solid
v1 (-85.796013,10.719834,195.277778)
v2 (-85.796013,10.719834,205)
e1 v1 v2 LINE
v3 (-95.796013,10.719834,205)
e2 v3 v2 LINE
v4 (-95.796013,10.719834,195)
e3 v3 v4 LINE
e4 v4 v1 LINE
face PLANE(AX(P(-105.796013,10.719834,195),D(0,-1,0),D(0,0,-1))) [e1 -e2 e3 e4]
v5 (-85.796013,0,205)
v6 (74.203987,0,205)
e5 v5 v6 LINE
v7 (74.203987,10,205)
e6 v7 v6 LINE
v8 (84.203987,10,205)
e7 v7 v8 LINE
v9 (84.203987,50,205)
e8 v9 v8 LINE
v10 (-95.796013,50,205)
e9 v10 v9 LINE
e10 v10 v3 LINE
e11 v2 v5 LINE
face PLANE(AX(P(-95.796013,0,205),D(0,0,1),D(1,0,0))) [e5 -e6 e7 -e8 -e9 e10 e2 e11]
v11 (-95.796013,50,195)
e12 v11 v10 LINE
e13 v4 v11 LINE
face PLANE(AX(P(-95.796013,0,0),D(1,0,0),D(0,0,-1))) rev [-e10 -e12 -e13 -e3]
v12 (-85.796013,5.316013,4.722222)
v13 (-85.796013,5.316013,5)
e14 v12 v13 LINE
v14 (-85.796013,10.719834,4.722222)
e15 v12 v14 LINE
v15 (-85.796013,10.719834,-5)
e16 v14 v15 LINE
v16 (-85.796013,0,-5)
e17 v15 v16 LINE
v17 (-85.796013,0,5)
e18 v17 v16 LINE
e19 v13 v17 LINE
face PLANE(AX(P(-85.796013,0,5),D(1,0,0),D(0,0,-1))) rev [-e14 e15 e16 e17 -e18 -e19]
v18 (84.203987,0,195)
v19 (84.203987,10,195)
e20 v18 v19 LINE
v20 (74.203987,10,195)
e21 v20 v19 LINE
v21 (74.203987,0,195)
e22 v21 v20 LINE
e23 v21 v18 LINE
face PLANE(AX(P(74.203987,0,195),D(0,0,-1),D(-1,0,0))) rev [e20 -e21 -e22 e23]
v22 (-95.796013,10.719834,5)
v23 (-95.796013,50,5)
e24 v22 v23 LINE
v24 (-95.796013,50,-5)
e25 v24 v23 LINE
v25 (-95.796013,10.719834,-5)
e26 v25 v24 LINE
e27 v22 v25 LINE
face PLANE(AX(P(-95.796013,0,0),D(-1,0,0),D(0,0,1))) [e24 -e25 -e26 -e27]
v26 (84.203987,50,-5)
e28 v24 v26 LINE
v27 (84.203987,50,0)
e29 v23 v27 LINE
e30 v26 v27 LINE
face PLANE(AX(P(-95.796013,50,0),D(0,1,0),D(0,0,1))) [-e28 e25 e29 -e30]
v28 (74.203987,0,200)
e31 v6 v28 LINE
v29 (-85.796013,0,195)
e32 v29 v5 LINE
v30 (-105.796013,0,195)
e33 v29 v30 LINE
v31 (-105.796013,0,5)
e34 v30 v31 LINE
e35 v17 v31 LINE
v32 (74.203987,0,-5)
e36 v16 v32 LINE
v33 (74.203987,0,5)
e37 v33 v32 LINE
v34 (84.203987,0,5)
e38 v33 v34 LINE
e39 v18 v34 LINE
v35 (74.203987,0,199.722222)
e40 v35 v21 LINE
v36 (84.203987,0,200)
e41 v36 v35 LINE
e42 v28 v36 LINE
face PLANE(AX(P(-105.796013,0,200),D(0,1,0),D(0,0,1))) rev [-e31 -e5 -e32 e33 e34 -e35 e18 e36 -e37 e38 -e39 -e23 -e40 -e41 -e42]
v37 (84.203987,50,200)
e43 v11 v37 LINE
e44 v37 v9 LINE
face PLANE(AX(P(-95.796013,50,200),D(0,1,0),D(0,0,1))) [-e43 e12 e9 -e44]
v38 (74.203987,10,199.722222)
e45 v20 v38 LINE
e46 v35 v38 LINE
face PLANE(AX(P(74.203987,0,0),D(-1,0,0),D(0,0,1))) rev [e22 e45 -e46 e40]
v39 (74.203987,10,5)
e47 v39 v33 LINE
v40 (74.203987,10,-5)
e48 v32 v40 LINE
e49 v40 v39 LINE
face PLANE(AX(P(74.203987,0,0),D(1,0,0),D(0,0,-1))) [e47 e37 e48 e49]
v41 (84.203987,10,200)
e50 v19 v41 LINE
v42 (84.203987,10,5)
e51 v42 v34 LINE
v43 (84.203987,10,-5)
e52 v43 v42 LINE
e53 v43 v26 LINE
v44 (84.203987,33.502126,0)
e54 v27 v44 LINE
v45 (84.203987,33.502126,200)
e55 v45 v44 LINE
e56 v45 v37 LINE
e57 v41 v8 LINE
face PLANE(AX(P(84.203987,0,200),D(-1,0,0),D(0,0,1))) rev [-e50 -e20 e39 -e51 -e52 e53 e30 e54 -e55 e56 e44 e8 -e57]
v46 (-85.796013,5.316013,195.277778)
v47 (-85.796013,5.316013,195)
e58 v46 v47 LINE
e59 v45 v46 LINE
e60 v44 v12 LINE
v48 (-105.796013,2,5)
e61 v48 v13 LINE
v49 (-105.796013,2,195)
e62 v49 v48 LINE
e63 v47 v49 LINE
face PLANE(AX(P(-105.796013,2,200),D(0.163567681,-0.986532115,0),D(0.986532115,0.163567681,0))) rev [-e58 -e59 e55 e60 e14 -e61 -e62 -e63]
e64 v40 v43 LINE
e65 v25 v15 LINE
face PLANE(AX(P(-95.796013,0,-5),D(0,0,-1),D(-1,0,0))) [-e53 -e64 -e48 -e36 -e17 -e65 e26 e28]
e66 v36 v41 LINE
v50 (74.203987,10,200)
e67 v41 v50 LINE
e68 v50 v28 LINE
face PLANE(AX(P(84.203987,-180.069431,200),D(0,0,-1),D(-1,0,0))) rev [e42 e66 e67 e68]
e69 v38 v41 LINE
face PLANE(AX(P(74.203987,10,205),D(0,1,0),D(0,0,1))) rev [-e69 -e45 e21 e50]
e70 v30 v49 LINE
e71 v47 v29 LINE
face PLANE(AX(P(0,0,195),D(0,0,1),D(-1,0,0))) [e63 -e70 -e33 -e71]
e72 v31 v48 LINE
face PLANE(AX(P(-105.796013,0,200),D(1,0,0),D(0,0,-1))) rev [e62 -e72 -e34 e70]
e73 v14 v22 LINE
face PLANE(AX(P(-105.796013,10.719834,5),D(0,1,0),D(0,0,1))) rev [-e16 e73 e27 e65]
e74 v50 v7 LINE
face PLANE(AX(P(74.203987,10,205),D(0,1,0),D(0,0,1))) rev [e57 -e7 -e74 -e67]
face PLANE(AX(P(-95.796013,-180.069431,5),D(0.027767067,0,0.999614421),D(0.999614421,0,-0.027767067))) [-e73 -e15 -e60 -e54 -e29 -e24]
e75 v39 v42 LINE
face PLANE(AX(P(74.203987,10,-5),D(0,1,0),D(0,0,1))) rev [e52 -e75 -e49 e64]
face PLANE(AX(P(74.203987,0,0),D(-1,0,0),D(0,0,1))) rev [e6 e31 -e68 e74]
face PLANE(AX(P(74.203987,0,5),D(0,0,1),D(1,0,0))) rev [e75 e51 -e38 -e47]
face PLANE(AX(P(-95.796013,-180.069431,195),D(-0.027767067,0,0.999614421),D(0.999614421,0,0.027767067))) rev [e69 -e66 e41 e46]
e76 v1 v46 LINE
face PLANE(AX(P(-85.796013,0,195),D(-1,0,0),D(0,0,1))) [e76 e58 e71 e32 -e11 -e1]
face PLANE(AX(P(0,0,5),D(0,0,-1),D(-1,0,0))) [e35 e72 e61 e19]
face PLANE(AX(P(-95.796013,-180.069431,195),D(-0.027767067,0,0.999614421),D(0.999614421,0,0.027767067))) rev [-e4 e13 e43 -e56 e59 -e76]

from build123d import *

# Parameters (mm, degrees)
BOSS_EXTRU_1_DEPTH      = 200
ESQUISSE4_W             = 5
ESQUISSE4_H             = 50
BOSS_EXTRU_4_DEPTH      = 180
BOSS_EXTRU_7_REACH      = 238.046
ESQUISSE5_W             = 10
ESQUISSE5_H             = 10
ENL_V_MAT_EXTRU_1_DEPTH = 10
ESQUISSE6_W             = 20
ESQUISSE6_H             = 10.719834163
ENL_V_MAT_EXTRU_2_DEPTH = 10
SYM_TRIE3_DEPTH         = 10.719834163
SYM_TRIE3_2_DEPTH       = 50
SYM_TRIE3_START         = 10.719834163
SYM_TRIE3_3_DEPTH       = 39.280165837


# Read off the part's stored shape, not the designer's step: Symétrie3
with BuildPart() as part:
    # Esquisse1 → Boss.-Extru.1 (new body)
    with BuildSketch(Plane.XY):
        Polygon((-105.796013405, 0), (84.203986595, 0), (84.203986595, 33.502126335), (-105.796013405, 2), align=None)
    extrude(amount=BOSS_EXTRU_1_DEPTH)

    # Esquisse4 → Boss.-Extru.4 (add)
    with BuildSketch(Plane(origin=(84.203986595, 0, 0), x_dir=(0, 0, -1), z_dir=(1, 0, 0))):
        with Locations((-202.5, 25)):
            Rectangle(ESQUISSE4_W, ESQUISSE4_H)
        with Locations((2.5, 25)):
            Rectangle(ESQUISSE4_W, ESQUISSE4_H)
    extrude(amount=-BOSS_EXTRU_4_DEPTH)

    # Boss.-Extru.7: up to this plane
    boss_extru_7_end = Plane(origin=(-105.796013405, 2, 200), z_dir=(0.16356768062493265, -0.9865321149638162, 0))
    # Esquisse8 → Boss.-Extru.7 (add, up to the surface)
    with BuildSketch(Plane(origin=(0, 50, 0), x_dir=(1, 0, 0), z_dir=(0, 1, 0)), mode=Mode.PRIVATE) as boss_extru_7_sk1:
        Polygon((84.203986595, 0), (-95.796013405, 0), (-95.796013405, -5), align=None)
    boss_extru_7_tool1 = split(extrude(boss_extru_7_sk1.sketch, amount=-BOSS_EXTRU_7_REACH, mode=Mode.PRIVATE), bisect_by=boss_extru_7_end, keep=Keep.BOTH, mode=Mode.PRIVATE)
    add(boss_extru_7_tool1.solids().sort_by_distance((-35.796013, 50, 1.666667))[0])

    # Esquisse5 → Enlèv. mat.-Extru.1 (cut)
    with BuildSketch(Plane(origin=(84.203986595, 0, 0), x_dir=(0, 0, -1), z_dir=(1, 0, 0))):
        with Locations((-200, 5)):
            Rectangle(ESQUISSE5_W, ESQUISSE5_H)
        with Locations((0, 5)):
            Rectangle(ESQUISSE5_W, ESQUISSE5_H)
    extrude(amount=-ENL_V_MAT_EXTRU_1_DEPTH, mode=Mode.SUBTRACT)

    # Esquisse6 → Enlèv. mat.-Extru.2 (cut)
    with BuildSketch(Plane(origin=(0, 0, -5), x_dir=(-1, 0, 0), z_dir=(0, 0, -1))):
        with Locations((95.796013405, 5.359917081)):
            Rectangle(ESQUISSE6_W, ESQUISSE6_H)
    extrude(amount=-ENL_V_MAT_EXTRU_2_DEPTH, mode=Mode.SUBTRACT)

    # Symétrie3 outline → Symétrie3 (cut)
    with BuildSketch(Plane(origin=(0, 0, 0), x_dir=(1, 0, 0), z_dir=(0, 1, 0))):
        Polygon((-95.796013405, -200), (-95.796013405, -205), (-85.796013405, -205), (-85.796013405, -195), (-105.796013405, -195), (-105.796013405, -200), align=None)
    extrude(amount=SYM_TRIE3_DEPTH, mode=Mode.SUBTRACT)

    # Sym_trie3 2 outline → Sym_trie3 2 (add)
    with BuildSketch(Plane(origin=(0, 0, 0), x_dir=(1, 0, 0), z_dir=(0, 1, 0))):
        Polygon((-85.796013405, -195.277777778), (-85.796013405, -200), (84.203986595, -200), align=None)
    extrude(amount=SYM_TRIE3_2_DEPTH)

    # Sym_trie3 3 outline → Sym_trie3 3 (add)
    with BuildSketch(Plane(origin=(0, 0, 0), x_dir=(1, 0, 0), z_dir=(0, 1, 0)).offset(SYM_TRIE3_START)):
        Polygon((-95.796013405, -195), (-95.796013405, -200), (-85.796013405, -200), (-85.796013405, -195.277777778), align=None)
    extrude(amount=SYM_TRIE3_3_DEPTH)


solid = part.part
